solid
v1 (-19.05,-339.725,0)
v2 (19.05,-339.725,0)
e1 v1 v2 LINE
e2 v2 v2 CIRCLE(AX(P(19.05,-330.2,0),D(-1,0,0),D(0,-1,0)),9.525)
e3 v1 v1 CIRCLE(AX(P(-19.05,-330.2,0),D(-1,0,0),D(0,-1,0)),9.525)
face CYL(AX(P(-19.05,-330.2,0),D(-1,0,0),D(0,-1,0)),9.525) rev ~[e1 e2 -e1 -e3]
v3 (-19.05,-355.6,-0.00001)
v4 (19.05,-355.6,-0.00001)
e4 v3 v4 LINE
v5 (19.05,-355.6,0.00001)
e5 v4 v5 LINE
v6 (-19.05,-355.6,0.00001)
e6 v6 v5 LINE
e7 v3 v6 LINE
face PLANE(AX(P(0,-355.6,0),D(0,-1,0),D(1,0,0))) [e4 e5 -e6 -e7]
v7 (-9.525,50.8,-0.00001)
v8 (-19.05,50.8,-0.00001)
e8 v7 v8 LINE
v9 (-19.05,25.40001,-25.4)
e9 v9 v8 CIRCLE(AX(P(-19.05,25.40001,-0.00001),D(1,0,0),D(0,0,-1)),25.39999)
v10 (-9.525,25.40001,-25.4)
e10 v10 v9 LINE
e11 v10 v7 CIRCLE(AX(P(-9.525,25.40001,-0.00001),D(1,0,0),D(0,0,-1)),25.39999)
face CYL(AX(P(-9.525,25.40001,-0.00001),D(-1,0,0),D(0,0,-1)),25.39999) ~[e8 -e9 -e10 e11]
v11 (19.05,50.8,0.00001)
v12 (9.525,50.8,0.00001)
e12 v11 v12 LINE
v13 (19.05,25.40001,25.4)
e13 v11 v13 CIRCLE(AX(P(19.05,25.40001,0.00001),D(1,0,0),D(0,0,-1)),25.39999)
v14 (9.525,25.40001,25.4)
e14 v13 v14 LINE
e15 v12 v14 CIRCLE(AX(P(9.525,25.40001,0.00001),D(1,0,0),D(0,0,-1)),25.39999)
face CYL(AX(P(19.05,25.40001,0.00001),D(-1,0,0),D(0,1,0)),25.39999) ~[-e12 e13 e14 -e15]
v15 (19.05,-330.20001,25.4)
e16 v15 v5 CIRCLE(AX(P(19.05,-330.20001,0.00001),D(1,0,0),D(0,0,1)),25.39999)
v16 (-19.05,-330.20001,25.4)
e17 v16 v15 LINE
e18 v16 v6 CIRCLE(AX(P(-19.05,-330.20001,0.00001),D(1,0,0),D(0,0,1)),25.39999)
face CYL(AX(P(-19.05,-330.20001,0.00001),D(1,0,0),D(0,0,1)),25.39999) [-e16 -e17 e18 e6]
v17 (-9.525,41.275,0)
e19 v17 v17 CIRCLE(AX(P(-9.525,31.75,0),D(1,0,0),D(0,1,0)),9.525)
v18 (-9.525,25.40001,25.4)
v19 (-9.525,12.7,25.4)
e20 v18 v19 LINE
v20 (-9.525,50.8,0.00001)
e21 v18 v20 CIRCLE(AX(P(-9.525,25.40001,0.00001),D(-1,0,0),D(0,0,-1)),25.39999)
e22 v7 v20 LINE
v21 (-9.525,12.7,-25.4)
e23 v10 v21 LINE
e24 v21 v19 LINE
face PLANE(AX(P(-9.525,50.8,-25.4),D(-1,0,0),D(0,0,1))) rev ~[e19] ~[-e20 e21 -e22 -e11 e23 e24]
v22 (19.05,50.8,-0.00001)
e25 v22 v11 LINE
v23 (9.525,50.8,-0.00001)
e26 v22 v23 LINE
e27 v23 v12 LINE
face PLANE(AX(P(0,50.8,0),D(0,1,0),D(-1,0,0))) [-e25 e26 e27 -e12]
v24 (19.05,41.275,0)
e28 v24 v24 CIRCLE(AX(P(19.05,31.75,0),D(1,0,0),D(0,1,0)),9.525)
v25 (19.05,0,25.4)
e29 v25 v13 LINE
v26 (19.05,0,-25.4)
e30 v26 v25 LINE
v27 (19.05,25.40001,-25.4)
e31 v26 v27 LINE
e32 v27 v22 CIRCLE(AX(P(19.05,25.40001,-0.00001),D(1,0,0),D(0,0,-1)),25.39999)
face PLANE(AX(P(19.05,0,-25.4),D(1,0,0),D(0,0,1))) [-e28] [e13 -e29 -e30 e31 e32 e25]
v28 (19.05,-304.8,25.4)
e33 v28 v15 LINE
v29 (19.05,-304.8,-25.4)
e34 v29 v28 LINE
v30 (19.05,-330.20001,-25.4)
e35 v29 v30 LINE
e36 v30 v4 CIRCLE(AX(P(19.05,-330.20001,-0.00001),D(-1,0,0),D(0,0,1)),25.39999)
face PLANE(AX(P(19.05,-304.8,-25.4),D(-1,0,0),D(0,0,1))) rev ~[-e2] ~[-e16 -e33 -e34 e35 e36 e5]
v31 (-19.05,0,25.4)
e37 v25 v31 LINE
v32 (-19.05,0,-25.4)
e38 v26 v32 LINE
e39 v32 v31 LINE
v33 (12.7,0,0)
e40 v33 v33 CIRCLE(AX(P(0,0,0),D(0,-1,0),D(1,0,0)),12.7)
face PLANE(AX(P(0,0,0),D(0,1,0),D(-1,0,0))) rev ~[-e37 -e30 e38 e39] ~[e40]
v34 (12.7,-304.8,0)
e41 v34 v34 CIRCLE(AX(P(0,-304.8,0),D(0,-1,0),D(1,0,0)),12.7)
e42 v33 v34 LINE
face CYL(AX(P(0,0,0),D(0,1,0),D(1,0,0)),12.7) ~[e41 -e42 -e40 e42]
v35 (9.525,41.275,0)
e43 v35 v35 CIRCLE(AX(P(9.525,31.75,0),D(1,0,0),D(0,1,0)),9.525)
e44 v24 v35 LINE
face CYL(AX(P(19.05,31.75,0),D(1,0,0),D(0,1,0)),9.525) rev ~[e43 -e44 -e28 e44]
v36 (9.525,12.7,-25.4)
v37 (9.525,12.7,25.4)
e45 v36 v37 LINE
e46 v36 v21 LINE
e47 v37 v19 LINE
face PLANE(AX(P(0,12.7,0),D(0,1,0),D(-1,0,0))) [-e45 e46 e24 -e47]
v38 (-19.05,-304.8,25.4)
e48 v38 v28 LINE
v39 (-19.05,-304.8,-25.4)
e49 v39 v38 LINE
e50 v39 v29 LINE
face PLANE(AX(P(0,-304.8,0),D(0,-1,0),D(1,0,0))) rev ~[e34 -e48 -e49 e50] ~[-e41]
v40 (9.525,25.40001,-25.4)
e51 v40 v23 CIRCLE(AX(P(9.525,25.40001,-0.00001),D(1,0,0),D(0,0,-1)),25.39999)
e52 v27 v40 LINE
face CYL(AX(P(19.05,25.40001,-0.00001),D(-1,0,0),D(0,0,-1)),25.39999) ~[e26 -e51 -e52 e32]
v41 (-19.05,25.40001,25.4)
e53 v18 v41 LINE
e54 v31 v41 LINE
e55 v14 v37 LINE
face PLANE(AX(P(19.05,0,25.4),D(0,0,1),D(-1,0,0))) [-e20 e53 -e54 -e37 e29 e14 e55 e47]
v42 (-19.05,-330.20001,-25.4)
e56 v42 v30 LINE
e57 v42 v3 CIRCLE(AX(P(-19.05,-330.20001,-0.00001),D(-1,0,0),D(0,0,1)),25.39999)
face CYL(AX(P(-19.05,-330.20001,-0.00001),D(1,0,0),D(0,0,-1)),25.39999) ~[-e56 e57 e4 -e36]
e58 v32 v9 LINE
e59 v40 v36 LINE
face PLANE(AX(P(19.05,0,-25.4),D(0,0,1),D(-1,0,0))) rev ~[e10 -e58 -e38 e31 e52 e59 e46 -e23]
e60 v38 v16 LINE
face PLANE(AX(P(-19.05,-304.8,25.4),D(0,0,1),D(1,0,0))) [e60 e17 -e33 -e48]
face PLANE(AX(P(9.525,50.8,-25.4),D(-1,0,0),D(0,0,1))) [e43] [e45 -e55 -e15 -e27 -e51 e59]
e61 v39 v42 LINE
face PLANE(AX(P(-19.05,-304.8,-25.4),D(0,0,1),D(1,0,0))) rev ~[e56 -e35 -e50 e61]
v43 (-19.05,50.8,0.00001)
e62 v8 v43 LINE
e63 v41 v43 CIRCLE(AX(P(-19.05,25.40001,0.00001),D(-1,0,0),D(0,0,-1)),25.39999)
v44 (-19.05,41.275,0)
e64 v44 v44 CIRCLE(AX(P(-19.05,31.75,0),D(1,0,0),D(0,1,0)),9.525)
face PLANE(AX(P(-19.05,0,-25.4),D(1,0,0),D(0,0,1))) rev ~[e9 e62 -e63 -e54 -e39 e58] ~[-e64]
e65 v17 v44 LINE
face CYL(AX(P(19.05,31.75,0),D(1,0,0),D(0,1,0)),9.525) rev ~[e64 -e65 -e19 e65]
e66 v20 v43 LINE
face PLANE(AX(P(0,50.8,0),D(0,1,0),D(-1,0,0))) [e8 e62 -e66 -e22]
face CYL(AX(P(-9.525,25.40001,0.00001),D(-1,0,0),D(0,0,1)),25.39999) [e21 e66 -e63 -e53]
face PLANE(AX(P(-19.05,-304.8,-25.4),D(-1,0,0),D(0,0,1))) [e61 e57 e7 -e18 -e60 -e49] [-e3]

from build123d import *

# Parameters (mm, degrees)
F0_R      = 12.7
F1_DEPTH  = 304.8
F2_W      = 38.1
F2_H      = 50.8
F3_DEPTH  = 50.8
F4_R      = 9.525
F5_DEPTH  = 38.101
F6_W      = 38.1
F6_H      = 50.8
F7_DEPTH  = 50.8
F8_W      = 19.05
F8_H      = 50.8
F9_DEPTH  = 38.1
F10_R     = 9.525
F11_DEPTH = 38.101
F12_R     = 25.39999


# Not quite as in the source:
# - a fillet or chamfer is up to 0.001 mm smaller than in the source, because OpenCascade refuses the exact size


with BuildPart() as f1:
    # F0 (on Front) → F1 (new body)
    with BuildSketch(Plane.XZ):
        Circle(F0_R)
    extrude(amount=F1_DEPTH)

    # F2 (on face) → F3 (join)
    with BuildSketch(Plane.XZ.offset(304.8)):
        Rectangle(F2_W, F2_H)
    extrude(amount=F3_DEPTH)

    # F4 (on face) → F5 (cut, through all)
    with BuildSketch(Plane(origin=(-19.05, 0, 0), x_dir=(0, -1, 0), z_dir=(-1, 0, 0))):
        with Locations((330.2, 0)):
            Circle(F4_R)
    extrude(amount=-F5_DEPTH, mode=Mode.SUBTRACT)

    # F6 (on face) → F7 (join)
    with BuildSketch(Plane(origin=(0, 0, 0), x_dir=(-1, 0, 0), z_dir=(0, 1, 0))):
        Rectangle(F6_W, F6_H)
    extrude(amount=F7_DEPTH)

    # F8 (on face) → F9 (cut)
    with BuildSketch(Plane(origin=(0, 50.8, 0), x_dir=(-1, 0, 0), z_dir=(0, 1, 0))):
        Rectangle(F8_W, F8_H)
    extrude(amount=-F9_DEPTH, mode=Mode.SUBTRACT)

    # F10 (on face) → F11 (cut, through all)
    with BuildSketch(Plane.YZ.offset(19.05)):
        with Locations((31.75, 0)):
            Circle(F10_R)
    extrude(amount=-F11_DEPTH, mode=Mode.SUBTRACT)

    # F12 (radius 25.4 in the source; OpenCascade refuses exactly that, so slightly less here)
    f12_edges = [f1.edges().sort_by_distance(p)[0] for p in [
        (14.2875, 50.8, 25.4),
        (14.2875, 50.8, -25.4),
        (-14.2875, 50.8, -25.4),
        (-14.2875, 50.8, 25.4),
        (0, -355.6, 25.4),
        (0, -355.6, -25.4),
    ]]
    fillet(f12_edges, radius=F12_R)


solid = f1.part
